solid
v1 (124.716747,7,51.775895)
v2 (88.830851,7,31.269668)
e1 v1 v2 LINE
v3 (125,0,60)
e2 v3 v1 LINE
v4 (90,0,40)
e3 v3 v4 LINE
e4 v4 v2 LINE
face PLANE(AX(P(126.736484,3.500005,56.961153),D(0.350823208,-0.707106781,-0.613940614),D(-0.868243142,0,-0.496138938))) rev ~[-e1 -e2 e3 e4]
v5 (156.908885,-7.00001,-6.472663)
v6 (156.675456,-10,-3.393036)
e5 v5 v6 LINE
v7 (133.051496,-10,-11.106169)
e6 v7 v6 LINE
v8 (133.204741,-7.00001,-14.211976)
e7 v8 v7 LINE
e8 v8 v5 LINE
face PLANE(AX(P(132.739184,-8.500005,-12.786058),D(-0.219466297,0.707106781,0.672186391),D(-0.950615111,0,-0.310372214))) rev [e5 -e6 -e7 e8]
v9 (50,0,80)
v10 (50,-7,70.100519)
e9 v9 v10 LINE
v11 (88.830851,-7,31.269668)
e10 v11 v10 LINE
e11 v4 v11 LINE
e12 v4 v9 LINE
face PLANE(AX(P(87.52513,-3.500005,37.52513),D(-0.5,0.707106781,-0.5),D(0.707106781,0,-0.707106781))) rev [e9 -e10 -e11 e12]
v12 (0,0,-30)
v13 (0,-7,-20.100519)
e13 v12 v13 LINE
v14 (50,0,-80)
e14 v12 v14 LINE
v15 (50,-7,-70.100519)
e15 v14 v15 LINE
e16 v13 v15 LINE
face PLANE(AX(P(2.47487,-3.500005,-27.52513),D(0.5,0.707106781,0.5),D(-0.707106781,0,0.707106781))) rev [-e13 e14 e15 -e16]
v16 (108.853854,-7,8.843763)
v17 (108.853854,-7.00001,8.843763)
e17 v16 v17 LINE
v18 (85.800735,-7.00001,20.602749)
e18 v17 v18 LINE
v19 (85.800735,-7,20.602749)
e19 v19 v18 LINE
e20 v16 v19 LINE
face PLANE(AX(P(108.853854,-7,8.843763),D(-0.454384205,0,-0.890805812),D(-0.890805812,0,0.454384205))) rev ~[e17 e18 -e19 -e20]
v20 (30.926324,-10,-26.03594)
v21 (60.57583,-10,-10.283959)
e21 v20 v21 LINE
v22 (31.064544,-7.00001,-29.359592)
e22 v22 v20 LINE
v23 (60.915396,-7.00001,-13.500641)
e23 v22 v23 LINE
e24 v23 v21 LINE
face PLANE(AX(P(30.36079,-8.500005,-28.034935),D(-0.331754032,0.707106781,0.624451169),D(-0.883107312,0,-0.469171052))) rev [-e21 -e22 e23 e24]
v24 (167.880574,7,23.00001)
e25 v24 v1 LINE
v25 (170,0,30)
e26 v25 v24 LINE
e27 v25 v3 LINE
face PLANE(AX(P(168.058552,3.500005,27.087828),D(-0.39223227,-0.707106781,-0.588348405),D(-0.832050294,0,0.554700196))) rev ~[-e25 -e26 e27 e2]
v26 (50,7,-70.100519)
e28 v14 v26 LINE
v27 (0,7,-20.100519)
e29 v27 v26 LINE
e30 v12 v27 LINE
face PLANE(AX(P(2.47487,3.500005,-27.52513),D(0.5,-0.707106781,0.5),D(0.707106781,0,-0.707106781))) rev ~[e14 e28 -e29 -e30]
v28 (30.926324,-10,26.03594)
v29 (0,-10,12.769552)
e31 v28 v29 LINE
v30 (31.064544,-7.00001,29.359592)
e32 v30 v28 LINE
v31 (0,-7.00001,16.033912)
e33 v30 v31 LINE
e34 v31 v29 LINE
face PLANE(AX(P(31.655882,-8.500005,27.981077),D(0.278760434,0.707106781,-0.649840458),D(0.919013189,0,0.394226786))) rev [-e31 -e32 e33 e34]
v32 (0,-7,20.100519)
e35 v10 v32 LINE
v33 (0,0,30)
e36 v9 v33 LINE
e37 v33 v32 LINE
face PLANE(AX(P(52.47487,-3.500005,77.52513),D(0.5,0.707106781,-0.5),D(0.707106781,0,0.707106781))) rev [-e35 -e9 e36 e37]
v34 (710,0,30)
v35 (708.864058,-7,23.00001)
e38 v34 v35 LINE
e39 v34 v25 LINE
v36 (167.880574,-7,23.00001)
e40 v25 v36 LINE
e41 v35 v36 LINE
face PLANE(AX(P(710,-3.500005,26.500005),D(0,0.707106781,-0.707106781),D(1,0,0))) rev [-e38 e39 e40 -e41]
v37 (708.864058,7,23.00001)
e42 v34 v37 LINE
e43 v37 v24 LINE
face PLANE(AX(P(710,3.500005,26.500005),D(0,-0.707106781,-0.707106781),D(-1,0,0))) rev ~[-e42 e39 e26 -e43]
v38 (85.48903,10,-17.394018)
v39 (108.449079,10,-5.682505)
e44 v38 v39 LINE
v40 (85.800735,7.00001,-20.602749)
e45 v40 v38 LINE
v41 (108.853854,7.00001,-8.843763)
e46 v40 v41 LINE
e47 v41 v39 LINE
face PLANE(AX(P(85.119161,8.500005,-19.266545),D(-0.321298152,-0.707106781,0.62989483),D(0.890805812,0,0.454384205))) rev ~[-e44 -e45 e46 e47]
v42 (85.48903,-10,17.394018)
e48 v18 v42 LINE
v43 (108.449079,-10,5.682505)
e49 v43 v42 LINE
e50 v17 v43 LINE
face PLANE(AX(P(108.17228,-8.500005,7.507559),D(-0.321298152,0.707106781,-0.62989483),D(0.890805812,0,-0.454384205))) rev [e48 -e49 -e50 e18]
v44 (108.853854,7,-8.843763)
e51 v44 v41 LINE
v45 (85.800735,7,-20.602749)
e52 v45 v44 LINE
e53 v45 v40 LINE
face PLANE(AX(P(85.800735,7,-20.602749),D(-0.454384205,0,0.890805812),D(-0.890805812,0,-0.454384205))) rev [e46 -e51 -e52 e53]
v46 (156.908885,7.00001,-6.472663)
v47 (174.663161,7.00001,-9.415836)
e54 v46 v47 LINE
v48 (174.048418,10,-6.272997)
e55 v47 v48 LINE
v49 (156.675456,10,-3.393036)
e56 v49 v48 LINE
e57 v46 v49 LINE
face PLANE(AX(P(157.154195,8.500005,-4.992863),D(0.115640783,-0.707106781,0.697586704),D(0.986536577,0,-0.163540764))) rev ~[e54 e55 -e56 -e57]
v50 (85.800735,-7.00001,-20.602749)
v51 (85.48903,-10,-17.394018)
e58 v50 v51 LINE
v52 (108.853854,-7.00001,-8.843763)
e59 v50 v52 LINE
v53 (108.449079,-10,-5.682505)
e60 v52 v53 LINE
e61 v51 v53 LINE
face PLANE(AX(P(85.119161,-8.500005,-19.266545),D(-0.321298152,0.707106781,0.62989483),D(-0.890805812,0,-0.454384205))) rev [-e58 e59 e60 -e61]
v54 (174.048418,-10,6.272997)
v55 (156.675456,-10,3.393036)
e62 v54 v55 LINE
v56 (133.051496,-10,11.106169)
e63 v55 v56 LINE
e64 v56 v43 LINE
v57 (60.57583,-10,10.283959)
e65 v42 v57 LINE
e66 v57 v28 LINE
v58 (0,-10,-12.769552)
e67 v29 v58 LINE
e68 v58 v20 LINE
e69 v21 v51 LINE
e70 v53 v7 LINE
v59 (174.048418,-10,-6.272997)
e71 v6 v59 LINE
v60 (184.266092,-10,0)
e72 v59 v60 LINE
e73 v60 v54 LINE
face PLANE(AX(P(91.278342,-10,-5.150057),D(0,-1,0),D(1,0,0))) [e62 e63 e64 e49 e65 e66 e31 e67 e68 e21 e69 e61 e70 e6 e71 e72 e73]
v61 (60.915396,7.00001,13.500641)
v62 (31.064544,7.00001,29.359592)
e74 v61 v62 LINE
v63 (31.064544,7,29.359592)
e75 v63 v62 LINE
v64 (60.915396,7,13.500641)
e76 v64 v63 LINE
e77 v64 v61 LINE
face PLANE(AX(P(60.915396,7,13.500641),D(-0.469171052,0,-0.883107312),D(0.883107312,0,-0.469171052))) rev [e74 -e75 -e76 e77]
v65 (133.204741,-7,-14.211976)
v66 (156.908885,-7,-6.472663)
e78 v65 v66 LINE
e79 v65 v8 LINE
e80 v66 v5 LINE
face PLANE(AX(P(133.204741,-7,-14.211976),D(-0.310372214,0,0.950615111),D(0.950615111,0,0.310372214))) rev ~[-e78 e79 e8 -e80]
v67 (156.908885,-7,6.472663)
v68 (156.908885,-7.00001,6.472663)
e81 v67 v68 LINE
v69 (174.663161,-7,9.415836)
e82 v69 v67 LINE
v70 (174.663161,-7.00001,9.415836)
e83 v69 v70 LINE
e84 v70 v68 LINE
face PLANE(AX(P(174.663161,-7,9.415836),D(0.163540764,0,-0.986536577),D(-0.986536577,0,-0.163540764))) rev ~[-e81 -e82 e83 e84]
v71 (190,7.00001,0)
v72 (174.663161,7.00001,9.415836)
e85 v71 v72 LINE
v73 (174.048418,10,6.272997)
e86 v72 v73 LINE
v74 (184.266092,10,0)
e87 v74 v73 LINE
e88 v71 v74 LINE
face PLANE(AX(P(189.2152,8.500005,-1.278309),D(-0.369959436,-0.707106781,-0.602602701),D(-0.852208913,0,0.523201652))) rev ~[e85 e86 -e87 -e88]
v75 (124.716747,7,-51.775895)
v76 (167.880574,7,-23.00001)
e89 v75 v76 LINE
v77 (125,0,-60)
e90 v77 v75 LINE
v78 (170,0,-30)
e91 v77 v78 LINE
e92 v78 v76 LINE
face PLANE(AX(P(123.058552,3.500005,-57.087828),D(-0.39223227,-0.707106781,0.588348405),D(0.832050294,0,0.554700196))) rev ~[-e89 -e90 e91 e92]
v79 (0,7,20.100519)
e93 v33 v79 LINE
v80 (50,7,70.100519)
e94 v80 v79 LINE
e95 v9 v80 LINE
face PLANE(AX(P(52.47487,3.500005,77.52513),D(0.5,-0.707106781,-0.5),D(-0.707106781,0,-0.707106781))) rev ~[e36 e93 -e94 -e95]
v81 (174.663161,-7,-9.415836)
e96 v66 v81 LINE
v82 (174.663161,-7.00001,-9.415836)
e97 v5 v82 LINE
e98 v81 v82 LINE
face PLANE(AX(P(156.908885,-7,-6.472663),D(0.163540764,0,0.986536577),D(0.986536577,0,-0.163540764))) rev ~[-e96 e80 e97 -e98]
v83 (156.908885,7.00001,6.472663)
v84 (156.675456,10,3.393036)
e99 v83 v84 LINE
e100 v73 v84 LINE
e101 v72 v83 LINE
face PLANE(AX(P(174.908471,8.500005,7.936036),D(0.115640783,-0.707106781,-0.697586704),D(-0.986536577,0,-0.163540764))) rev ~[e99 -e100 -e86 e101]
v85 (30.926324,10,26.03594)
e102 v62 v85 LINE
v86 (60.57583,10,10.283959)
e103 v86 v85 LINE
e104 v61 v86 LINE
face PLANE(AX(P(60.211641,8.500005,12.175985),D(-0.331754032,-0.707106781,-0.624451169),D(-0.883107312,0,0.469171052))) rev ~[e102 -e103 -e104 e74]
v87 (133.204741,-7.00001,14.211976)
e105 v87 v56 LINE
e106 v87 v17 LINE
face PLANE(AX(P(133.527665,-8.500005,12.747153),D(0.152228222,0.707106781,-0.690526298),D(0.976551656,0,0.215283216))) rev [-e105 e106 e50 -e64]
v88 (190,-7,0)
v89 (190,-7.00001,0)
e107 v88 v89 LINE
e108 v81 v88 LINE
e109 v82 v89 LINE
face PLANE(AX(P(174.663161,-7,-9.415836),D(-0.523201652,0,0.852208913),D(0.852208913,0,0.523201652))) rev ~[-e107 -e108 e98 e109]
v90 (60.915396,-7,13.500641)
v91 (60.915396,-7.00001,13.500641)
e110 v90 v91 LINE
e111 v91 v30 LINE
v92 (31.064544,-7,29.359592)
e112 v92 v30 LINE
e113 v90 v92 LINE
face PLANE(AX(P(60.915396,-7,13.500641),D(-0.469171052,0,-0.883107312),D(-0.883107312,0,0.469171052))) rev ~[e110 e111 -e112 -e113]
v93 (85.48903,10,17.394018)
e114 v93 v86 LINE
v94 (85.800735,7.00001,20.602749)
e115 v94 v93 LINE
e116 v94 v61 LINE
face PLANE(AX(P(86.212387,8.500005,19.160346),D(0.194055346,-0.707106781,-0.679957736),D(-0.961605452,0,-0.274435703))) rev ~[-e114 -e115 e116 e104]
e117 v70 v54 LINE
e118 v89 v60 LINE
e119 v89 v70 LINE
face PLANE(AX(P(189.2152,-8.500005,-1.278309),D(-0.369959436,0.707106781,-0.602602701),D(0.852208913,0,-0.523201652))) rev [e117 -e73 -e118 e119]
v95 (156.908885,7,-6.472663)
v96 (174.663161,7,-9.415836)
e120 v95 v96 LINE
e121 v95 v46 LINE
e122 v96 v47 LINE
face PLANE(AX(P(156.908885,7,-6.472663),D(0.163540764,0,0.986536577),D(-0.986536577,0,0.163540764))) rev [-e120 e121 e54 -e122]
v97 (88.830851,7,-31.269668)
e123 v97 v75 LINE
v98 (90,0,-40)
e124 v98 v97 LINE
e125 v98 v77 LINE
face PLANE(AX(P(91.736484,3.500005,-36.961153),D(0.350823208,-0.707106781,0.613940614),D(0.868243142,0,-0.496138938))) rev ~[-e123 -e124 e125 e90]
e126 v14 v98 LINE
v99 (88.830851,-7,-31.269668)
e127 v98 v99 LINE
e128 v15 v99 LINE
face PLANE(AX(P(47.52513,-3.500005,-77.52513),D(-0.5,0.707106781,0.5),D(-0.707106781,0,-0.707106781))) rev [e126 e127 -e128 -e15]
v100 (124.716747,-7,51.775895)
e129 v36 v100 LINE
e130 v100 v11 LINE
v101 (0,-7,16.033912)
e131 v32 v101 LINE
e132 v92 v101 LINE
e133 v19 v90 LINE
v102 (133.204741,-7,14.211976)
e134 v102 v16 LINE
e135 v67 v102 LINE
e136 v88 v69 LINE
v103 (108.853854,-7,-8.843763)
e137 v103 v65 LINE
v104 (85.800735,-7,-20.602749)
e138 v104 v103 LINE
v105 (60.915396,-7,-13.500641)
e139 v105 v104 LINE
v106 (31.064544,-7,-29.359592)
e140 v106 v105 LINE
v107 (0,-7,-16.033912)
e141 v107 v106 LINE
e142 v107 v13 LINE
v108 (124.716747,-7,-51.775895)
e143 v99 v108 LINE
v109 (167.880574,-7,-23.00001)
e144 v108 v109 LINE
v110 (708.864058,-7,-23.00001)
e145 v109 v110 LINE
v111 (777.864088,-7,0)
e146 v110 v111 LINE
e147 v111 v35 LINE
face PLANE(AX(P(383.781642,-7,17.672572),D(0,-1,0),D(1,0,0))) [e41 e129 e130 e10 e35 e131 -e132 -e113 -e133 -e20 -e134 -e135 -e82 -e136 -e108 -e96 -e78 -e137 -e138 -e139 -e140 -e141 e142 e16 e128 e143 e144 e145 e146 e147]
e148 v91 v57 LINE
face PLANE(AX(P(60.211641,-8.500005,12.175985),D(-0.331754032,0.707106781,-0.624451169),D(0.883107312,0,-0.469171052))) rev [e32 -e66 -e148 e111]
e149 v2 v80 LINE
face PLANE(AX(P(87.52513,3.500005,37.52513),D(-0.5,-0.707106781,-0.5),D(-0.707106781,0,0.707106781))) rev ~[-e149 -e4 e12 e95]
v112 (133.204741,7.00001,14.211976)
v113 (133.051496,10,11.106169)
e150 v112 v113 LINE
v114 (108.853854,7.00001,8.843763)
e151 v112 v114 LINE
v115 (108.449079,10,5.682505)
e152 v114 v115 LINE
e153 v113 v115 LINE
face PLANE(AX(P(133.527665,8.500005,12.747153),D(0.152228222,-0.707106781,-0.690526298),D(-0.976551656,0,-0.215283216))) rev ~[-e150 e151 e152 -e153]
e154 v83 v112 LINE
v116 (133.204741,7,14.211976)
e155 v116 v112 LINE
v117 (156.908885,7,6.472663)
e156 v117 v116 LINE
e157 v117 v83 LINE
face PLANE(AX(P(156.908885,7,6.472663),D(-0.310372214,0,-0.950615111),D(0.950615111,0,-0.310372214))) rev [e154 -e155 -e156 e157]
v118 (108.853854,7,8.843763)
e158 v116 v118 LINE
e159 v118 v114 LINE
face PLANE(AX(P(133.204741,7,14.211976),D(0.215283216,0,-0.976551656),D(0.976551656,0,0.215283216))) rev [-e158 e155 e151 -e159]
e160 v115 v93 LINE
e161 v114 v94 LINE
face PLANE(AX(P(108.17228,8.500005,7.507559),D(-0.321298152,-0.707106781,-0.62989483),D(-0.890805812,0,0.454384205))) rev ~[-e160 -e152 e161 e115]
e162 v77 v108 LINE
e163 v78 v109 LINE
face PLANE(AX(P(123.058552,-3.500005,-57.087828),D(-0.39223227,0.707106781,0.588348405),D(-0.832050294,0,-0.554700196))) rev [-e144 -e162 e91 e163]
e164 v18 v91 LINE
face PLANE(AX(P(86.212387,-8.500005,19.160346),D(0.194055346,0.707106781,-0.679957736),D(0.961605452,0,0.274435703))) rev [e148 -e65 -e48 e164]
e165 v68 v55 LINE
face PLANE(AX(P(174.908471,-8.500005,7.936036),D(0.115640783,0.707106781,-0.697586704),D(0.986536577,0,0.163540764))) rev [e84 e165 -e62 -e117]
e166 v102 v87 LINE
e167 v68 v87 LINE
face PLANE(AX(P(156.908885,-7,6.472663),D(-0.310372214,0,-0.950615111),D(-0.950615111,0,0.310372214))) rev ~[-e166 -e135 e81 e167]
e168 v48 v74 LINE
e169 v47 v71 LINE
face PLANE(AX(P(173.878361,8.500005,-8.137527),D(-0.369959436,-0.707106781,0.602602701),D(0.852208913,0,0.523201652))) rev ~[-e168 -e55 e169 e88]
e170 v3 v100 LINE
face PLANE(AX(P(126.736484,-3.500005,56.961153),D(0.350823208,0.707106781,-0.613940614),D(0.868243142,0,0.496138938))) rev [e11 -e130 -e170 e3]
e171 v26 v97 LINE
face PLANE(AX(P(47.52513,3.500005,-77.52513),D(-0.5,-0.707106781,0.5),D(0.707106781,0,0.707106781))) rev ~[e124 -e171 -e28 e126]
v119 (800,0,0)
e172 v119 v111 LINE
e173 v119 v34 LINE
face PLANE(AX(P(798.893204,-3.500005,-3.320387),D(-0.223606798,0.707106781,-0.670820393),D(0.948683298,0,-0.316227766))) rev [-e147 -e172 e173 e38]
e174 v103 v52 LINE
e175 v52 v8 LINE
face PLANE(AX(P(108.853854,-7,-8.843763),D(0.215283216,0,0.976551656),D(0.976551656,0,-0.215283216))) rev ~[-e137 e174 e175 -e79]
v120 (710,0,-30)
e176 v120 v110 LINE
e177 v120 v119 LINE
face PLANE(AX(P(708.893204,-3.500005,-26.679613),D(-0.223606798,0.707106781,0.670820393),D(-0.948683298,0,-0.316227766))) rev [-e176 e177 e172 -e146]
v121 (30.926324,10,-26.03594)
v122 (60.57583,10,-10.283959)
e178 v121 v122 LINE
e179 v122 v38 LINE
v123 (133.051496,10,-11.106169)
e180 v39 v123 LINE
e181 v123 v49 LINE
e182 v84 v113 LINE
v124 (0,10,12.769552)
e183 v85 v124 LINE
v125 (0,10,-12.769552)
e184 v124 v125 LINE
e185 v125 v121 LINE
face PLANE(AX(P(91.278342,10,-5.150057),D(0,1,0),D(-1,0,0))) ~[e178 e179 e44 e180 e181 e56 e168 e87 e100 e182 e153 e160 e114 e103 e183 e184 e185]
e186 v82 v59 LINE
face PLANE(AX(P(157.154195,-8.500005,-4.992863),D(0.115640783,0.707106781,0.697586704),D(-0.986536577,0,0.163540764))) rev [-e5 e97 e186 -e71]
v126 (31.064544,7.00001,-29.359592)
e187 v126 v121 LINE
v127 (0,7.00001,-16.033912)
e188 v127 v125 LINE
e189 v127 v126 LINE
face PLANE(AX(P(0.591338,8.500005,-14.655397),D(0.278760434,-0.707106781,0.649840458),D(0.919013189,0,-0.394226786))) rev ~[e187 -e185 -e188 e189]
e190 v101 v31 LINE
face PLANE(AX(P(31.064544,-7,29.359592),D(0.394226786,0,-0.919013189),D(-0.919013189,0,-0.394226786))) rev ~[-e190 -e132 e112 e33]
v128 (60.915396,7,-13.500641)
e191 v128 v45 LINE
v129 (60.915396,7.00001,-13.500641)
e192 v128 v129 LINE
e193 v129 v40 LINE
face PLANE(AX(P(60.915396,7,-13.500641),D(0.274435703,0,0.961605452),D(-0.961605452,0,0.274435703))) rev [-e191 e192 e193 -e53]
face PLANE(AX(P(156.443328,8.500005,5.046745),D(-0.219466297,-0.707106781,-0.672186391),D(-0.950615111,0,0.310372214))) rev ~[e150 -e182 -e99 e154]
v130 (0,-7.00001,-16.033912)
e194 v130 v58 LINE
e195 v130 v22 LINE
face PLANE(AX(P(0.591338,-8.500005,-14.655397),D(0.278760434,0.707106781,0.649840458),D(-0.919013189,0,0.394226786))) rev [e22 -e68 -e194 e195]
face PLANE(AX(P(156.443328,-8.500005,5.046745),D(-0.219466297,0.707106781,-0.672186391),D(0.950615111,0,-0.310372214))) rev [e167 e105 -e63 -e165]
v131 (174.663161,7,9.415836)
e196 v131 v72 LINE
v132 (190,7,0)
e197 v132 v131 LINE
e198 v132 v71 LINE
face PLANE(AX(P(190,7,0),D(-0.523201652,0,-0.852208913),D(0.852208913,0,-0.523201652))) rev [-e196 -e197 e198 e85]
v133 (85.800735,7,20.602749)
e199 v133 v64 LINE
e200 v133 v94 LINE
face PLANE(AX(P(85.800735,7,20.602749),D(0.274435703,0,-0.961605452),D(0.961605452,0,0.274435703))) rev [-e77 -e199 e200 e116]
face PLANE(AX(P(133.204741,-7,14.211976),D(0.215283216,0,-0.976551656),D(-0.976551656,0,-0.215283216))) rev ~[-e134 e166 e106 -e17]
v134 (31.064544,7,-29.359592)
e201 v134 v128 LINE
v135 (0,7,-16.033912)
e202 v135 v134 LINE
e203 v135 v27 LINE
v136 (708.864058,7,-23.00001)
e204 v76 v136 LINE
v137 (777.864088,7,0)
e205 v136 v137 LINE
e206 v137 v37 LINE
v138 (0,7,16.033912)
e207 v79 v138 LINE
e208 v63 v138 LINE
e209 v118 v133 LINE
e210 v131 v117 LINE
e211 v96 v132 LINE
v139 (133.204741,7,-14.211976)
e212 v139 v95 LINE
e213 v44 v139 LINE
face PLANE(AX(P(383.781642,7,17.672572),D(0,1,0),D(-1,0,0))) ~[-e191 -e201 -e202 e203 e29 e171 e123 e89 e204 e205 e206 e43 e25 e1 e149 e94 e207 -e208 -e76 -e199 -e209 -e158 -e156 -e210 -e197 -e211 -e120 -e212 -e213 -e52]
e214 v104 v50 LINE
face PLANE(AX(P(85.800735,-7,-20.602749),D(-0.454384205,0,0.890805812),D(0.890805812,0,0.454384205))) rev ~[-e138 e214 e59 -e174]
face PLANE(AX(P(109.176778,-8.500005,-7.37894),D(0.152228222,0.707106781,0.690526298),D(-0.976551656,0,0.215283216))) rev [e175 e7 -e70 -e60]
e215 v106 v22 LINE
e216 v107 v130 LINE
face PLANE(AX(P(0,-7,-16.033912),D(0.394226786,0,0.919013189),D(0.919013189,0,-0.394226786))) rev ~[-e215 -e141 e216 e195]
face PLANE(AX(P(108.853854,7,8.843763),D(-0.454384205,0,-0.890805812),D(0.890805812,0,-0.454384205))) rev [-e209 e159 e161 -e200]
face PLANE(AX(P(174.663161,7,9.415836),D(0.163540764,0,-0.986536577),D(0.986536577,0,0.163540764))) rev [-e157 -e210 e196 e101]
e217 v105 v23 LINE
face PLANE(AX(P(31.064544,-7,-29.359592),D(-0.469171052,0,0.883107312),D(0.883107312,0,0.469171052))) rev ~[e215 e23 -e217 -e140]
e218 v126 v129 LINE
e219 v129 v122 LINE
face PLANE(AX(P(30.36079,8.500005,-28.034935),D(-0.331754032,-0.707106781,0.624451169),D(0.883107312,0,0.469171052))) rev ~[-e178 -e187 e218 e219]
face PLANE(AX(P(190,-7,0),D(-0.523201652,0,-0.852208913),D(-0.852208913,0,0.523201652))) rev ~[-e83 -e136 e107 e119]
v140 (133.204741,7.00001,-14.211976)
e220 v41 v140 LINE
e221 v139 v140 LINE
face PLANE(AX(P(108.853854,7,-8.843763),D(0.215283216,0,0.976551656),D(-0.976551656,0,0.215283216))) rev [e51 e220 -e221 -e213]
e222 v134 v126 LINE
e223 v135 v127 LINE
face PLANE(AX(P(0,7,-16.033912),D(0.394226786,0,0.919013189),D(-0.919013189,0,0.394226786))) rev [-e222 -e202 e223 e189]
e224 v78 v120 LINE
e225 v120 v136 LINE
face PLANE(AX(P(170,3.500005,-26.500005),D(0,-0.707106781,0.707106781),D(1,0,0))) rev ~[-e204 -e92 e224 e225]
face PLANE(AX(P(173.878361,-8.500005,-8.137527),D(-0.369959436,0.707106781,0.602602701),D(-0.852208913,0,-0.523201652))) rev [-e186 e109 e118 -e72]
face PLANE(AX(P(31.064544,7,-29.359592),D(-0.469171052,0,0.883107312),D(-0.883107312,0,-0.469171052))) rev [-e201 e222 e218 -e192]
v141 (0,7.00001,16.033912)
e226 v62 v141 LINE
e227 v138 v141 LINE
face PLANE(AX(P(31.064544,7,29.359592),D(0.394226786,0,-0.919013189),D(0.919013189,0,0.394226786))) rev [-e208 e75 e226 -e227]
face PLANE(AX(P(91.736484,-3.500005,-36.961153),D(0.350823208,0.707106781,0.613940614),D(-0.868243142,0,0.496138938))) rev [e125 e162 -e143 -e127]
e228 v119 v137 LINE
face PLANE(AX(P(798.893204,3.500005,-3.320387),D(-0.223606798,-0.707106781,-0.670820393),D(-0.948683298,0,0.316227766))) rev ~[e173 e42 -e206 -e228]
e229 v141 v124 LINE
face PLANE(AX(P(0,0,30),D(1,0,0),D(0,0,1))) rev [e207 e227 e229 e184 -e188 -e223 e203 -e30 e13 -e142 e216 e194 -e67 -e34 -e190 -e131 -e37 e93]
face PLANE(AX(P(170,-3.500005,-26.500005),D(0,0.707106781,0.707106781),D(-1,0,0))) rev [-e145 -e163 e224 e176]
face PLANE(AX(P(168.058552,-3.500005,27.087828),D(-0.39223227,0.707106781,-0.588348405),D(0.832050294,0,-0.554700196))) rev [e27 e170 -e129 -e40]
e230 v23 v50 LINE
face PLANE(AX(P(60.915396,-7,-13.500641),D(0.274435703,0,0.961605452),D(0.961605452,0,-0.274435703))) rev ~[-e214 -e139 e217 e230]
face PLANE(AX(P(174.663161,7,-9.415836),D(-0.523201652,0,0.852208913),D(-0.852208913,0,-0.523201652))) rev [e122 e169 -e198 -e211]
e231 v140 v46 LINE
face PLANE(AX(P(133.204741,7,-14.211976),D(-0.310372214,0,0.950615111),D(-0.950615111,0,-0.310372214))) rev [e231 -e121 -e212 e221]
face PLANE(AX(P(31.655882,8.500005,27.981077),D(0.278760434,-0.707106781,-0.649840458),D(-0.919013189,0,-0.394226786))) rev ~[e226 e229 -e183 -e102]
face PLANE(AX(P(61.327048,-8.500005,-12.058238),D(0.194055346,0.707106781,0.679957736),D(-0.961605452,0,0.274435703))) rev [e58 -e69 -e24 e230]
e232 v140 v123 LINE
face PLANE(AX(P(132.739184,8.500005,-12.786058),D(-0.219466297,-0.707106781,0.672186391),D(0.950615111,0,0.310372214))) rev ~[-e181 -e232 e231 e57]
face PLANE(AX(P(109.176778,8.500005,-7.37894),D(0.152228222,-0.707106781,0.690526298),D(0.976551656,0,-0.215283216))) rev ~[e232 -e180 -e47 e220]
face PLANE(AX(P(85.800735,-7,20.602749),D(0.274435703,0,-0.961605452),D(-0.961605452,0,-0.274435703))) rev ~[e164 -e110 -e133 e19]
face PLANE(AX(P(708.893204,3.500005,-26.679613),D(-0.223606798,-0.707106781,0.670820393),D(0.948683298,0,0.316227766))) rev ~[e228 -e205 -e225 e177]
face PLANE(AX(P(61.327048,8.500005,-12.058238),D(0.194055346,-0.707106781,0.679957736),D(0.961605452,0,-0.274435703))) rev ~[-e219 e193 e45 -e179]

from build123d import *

# Parameters (mm, degrees)
F1_DEPTH = 7
F2_SIZE  = 6.99999
F4_DEPTH = 3
F5_SIZE  = 2.99999


# Not quite as in the source:
# - a fillet or chamfer is up to 0.001 mm smaller than in the source, because OpenCascade refuses the exact size


with BuildPart() as f1:
    # F0 (on Front) → F1 (new body)
    with BuildSketch(Plane.XZ):
        Polygon((0, 30), (0, 0), (800, 0), (710, 30), (170, 30), (125, 60), (90, 40), (50, 80), align=None)
        Polygon((800, 0), (0, 0), (0, -30), (50, -80), (90, -40), (125, -60), (170, -30), (710, -30), align=None)
    extrude(amount=F1_DEPTH)

    # F2 (size 7 in the source; OpenCascade refuses exactly that, so slightly less here)
    f2_edges = [f1.edges().sort_by_distance(p)[0] for p in [
        (25, -7, 55),
        (70, -7, 60),
        (107.5, -7, 50),
        (147.5, -7, 45),
        (440, -7, 30),
        (755, -7, 15),
        (25, -7, -55),
        (70, -7, -60),
        (107.5, -7, -50),
        (147.5, -7, -45),
        (440, -7, -30),
        (755, -7, -15),
    ]]
    chamfer(f2_edges, length=F2_SIZE)

    # F3 (on face) → F4 (join)
    with BuildSketch(Plane.XZ.offset(7)):
        Polygon((173.4544423223, -3.2363315113), (190, 0), (0, 0), (0, -16.0339120775), (30.4576978087, -14.7672765888), (60.9153956175, -13.5006411001), (84.8846249282, -11.1722019501), (108.853854239, -8.8437628001), (132.8813694417, -7.6582129113), (156.9088846445, -6.4726630226), align=None)
        Polygon((173.4544423223, 3.2363315113), (190, 0), (174.6631610562, 9.4158361321), align=None)
        Polygon((0, 0), (190, 0), (173.4544423223, 3.2363315113), (156.9088846445, 6.4726630226), (132.8813694417, 7.6582129113), (108.853854239, 8.8437628001), (84.8846249282, 11.1722019501), (60.9153956175, 13.5006411001), (30.4576978087, 14.7672765888), (0, 16.0339120775), align=None)
        Polygon((174.6631610562, -9.4158361321), (190, 0), (173.4544423223, -3.2363315113), align=None)
        Polygon((173.4544423223, 3.2363315113), (174.6631610562, 9.4158361321), (156.9088846445, 6.4726630226), align=None)
        Polygon((174.6631610562, -9.4158361321), (173.4544423223, -3.2363315113), (156.9088846445, -6.4726630226), align=None)
        Polygon((31.0645442111, 29.359591825), (0, 16.0339120775), (30.4576978087, 14.7672765888), align=None)
        Polygon((30.4576978087, -14.7672765888), (0, -16.0339120775), (31.0645442111, -29.359591825), align=None)
        Polygon((132.8813694417, 7.6582129113), (156.9088846445, 6.4726630226), (133.2047409049, 14.2119757014), align=None)
        Polygon((133.2047409049, -14.2119757014), (156.9088846445, -6.4726630226), (132.8813694417, -7.6582129113), align=None)
        Polygon((60.9153956175, 13.5006411001), (31.0645442111, 29.359591825), (30.4576978087, 14.7672765888), align=None)
        Polygon((30.4576978087, -14.7672765888), (31.0645442111, -29.359591825), (60.9153956175, -13.5006411001), align=None)
        Polygon((132.8813694417, 7.6582129113), (133.2047409049, 14.2119757014), (108.853854239, 8.8437628001), align=None)
        Polygon((108.853854239, -8.8437628001), (133.2047409049, -14.2119757014), (132.8813694417, -7.6582129113), align=None)
        Polygon((85.8007351026, 20.602748951), (60.9153956175, 13.5006411001), (84.8846249282, 11.1722019501), align=None)
        Polygon((84.8846249282, -11.1722019501), (60.9153956175, -13.5006411001), (85.8007351026, -20.602748951), align=None)
        Polygon((84.8846249282, 11.1722019501), (108.853854239, 8.8437628001), (85.8007351026, 20.602748951), align=None)
        Polygon((85.8007351026, -20.602748951), (108.853854239, -8.8437628001), (84.8846249282, -11.1722019501), align=None)
    extrude(amount=F4_DEPTH)

    # F5 (size 3 in the source; OpenCascade refuses exactly that, so slightly less here)
    f5_edges = [f1.edges().sort_by_distance(p)[0] for p in [
        (15.532272, -10, 22.696752),
        (45.98997, -10, 21.430116),
        (73.358065, -10, 17.051695),
        (97.327295, -10, 14.723256),
        (121.029298, -10, 11.527869),
        (145.056813, -10, 10.342319),
        (165.786023, -10, 7.94425),
        (182.331581, -10, 4.707918),
        (182.331581, -10, -4.707918),
        (165.786023, -10, -7.94425),
        (145.056813, -10, -10.342319),
        (121.029298, -10, -11.527869),
        (97.327295, -10, -14.723256),
        (73.358065, -10, -17.051695),
        (45.98997, -10, -21.430116),
        (15.532272, -10, -22.696752),
    ]]
    chamfer(f5_edges, length=F5_SIZE)

    # F6: F1 across plane


with BuildPart() as f1_1:
    add(f1.part)
    add(f1.part.mirror(Plane.XZ))


solid = f1_1.part
